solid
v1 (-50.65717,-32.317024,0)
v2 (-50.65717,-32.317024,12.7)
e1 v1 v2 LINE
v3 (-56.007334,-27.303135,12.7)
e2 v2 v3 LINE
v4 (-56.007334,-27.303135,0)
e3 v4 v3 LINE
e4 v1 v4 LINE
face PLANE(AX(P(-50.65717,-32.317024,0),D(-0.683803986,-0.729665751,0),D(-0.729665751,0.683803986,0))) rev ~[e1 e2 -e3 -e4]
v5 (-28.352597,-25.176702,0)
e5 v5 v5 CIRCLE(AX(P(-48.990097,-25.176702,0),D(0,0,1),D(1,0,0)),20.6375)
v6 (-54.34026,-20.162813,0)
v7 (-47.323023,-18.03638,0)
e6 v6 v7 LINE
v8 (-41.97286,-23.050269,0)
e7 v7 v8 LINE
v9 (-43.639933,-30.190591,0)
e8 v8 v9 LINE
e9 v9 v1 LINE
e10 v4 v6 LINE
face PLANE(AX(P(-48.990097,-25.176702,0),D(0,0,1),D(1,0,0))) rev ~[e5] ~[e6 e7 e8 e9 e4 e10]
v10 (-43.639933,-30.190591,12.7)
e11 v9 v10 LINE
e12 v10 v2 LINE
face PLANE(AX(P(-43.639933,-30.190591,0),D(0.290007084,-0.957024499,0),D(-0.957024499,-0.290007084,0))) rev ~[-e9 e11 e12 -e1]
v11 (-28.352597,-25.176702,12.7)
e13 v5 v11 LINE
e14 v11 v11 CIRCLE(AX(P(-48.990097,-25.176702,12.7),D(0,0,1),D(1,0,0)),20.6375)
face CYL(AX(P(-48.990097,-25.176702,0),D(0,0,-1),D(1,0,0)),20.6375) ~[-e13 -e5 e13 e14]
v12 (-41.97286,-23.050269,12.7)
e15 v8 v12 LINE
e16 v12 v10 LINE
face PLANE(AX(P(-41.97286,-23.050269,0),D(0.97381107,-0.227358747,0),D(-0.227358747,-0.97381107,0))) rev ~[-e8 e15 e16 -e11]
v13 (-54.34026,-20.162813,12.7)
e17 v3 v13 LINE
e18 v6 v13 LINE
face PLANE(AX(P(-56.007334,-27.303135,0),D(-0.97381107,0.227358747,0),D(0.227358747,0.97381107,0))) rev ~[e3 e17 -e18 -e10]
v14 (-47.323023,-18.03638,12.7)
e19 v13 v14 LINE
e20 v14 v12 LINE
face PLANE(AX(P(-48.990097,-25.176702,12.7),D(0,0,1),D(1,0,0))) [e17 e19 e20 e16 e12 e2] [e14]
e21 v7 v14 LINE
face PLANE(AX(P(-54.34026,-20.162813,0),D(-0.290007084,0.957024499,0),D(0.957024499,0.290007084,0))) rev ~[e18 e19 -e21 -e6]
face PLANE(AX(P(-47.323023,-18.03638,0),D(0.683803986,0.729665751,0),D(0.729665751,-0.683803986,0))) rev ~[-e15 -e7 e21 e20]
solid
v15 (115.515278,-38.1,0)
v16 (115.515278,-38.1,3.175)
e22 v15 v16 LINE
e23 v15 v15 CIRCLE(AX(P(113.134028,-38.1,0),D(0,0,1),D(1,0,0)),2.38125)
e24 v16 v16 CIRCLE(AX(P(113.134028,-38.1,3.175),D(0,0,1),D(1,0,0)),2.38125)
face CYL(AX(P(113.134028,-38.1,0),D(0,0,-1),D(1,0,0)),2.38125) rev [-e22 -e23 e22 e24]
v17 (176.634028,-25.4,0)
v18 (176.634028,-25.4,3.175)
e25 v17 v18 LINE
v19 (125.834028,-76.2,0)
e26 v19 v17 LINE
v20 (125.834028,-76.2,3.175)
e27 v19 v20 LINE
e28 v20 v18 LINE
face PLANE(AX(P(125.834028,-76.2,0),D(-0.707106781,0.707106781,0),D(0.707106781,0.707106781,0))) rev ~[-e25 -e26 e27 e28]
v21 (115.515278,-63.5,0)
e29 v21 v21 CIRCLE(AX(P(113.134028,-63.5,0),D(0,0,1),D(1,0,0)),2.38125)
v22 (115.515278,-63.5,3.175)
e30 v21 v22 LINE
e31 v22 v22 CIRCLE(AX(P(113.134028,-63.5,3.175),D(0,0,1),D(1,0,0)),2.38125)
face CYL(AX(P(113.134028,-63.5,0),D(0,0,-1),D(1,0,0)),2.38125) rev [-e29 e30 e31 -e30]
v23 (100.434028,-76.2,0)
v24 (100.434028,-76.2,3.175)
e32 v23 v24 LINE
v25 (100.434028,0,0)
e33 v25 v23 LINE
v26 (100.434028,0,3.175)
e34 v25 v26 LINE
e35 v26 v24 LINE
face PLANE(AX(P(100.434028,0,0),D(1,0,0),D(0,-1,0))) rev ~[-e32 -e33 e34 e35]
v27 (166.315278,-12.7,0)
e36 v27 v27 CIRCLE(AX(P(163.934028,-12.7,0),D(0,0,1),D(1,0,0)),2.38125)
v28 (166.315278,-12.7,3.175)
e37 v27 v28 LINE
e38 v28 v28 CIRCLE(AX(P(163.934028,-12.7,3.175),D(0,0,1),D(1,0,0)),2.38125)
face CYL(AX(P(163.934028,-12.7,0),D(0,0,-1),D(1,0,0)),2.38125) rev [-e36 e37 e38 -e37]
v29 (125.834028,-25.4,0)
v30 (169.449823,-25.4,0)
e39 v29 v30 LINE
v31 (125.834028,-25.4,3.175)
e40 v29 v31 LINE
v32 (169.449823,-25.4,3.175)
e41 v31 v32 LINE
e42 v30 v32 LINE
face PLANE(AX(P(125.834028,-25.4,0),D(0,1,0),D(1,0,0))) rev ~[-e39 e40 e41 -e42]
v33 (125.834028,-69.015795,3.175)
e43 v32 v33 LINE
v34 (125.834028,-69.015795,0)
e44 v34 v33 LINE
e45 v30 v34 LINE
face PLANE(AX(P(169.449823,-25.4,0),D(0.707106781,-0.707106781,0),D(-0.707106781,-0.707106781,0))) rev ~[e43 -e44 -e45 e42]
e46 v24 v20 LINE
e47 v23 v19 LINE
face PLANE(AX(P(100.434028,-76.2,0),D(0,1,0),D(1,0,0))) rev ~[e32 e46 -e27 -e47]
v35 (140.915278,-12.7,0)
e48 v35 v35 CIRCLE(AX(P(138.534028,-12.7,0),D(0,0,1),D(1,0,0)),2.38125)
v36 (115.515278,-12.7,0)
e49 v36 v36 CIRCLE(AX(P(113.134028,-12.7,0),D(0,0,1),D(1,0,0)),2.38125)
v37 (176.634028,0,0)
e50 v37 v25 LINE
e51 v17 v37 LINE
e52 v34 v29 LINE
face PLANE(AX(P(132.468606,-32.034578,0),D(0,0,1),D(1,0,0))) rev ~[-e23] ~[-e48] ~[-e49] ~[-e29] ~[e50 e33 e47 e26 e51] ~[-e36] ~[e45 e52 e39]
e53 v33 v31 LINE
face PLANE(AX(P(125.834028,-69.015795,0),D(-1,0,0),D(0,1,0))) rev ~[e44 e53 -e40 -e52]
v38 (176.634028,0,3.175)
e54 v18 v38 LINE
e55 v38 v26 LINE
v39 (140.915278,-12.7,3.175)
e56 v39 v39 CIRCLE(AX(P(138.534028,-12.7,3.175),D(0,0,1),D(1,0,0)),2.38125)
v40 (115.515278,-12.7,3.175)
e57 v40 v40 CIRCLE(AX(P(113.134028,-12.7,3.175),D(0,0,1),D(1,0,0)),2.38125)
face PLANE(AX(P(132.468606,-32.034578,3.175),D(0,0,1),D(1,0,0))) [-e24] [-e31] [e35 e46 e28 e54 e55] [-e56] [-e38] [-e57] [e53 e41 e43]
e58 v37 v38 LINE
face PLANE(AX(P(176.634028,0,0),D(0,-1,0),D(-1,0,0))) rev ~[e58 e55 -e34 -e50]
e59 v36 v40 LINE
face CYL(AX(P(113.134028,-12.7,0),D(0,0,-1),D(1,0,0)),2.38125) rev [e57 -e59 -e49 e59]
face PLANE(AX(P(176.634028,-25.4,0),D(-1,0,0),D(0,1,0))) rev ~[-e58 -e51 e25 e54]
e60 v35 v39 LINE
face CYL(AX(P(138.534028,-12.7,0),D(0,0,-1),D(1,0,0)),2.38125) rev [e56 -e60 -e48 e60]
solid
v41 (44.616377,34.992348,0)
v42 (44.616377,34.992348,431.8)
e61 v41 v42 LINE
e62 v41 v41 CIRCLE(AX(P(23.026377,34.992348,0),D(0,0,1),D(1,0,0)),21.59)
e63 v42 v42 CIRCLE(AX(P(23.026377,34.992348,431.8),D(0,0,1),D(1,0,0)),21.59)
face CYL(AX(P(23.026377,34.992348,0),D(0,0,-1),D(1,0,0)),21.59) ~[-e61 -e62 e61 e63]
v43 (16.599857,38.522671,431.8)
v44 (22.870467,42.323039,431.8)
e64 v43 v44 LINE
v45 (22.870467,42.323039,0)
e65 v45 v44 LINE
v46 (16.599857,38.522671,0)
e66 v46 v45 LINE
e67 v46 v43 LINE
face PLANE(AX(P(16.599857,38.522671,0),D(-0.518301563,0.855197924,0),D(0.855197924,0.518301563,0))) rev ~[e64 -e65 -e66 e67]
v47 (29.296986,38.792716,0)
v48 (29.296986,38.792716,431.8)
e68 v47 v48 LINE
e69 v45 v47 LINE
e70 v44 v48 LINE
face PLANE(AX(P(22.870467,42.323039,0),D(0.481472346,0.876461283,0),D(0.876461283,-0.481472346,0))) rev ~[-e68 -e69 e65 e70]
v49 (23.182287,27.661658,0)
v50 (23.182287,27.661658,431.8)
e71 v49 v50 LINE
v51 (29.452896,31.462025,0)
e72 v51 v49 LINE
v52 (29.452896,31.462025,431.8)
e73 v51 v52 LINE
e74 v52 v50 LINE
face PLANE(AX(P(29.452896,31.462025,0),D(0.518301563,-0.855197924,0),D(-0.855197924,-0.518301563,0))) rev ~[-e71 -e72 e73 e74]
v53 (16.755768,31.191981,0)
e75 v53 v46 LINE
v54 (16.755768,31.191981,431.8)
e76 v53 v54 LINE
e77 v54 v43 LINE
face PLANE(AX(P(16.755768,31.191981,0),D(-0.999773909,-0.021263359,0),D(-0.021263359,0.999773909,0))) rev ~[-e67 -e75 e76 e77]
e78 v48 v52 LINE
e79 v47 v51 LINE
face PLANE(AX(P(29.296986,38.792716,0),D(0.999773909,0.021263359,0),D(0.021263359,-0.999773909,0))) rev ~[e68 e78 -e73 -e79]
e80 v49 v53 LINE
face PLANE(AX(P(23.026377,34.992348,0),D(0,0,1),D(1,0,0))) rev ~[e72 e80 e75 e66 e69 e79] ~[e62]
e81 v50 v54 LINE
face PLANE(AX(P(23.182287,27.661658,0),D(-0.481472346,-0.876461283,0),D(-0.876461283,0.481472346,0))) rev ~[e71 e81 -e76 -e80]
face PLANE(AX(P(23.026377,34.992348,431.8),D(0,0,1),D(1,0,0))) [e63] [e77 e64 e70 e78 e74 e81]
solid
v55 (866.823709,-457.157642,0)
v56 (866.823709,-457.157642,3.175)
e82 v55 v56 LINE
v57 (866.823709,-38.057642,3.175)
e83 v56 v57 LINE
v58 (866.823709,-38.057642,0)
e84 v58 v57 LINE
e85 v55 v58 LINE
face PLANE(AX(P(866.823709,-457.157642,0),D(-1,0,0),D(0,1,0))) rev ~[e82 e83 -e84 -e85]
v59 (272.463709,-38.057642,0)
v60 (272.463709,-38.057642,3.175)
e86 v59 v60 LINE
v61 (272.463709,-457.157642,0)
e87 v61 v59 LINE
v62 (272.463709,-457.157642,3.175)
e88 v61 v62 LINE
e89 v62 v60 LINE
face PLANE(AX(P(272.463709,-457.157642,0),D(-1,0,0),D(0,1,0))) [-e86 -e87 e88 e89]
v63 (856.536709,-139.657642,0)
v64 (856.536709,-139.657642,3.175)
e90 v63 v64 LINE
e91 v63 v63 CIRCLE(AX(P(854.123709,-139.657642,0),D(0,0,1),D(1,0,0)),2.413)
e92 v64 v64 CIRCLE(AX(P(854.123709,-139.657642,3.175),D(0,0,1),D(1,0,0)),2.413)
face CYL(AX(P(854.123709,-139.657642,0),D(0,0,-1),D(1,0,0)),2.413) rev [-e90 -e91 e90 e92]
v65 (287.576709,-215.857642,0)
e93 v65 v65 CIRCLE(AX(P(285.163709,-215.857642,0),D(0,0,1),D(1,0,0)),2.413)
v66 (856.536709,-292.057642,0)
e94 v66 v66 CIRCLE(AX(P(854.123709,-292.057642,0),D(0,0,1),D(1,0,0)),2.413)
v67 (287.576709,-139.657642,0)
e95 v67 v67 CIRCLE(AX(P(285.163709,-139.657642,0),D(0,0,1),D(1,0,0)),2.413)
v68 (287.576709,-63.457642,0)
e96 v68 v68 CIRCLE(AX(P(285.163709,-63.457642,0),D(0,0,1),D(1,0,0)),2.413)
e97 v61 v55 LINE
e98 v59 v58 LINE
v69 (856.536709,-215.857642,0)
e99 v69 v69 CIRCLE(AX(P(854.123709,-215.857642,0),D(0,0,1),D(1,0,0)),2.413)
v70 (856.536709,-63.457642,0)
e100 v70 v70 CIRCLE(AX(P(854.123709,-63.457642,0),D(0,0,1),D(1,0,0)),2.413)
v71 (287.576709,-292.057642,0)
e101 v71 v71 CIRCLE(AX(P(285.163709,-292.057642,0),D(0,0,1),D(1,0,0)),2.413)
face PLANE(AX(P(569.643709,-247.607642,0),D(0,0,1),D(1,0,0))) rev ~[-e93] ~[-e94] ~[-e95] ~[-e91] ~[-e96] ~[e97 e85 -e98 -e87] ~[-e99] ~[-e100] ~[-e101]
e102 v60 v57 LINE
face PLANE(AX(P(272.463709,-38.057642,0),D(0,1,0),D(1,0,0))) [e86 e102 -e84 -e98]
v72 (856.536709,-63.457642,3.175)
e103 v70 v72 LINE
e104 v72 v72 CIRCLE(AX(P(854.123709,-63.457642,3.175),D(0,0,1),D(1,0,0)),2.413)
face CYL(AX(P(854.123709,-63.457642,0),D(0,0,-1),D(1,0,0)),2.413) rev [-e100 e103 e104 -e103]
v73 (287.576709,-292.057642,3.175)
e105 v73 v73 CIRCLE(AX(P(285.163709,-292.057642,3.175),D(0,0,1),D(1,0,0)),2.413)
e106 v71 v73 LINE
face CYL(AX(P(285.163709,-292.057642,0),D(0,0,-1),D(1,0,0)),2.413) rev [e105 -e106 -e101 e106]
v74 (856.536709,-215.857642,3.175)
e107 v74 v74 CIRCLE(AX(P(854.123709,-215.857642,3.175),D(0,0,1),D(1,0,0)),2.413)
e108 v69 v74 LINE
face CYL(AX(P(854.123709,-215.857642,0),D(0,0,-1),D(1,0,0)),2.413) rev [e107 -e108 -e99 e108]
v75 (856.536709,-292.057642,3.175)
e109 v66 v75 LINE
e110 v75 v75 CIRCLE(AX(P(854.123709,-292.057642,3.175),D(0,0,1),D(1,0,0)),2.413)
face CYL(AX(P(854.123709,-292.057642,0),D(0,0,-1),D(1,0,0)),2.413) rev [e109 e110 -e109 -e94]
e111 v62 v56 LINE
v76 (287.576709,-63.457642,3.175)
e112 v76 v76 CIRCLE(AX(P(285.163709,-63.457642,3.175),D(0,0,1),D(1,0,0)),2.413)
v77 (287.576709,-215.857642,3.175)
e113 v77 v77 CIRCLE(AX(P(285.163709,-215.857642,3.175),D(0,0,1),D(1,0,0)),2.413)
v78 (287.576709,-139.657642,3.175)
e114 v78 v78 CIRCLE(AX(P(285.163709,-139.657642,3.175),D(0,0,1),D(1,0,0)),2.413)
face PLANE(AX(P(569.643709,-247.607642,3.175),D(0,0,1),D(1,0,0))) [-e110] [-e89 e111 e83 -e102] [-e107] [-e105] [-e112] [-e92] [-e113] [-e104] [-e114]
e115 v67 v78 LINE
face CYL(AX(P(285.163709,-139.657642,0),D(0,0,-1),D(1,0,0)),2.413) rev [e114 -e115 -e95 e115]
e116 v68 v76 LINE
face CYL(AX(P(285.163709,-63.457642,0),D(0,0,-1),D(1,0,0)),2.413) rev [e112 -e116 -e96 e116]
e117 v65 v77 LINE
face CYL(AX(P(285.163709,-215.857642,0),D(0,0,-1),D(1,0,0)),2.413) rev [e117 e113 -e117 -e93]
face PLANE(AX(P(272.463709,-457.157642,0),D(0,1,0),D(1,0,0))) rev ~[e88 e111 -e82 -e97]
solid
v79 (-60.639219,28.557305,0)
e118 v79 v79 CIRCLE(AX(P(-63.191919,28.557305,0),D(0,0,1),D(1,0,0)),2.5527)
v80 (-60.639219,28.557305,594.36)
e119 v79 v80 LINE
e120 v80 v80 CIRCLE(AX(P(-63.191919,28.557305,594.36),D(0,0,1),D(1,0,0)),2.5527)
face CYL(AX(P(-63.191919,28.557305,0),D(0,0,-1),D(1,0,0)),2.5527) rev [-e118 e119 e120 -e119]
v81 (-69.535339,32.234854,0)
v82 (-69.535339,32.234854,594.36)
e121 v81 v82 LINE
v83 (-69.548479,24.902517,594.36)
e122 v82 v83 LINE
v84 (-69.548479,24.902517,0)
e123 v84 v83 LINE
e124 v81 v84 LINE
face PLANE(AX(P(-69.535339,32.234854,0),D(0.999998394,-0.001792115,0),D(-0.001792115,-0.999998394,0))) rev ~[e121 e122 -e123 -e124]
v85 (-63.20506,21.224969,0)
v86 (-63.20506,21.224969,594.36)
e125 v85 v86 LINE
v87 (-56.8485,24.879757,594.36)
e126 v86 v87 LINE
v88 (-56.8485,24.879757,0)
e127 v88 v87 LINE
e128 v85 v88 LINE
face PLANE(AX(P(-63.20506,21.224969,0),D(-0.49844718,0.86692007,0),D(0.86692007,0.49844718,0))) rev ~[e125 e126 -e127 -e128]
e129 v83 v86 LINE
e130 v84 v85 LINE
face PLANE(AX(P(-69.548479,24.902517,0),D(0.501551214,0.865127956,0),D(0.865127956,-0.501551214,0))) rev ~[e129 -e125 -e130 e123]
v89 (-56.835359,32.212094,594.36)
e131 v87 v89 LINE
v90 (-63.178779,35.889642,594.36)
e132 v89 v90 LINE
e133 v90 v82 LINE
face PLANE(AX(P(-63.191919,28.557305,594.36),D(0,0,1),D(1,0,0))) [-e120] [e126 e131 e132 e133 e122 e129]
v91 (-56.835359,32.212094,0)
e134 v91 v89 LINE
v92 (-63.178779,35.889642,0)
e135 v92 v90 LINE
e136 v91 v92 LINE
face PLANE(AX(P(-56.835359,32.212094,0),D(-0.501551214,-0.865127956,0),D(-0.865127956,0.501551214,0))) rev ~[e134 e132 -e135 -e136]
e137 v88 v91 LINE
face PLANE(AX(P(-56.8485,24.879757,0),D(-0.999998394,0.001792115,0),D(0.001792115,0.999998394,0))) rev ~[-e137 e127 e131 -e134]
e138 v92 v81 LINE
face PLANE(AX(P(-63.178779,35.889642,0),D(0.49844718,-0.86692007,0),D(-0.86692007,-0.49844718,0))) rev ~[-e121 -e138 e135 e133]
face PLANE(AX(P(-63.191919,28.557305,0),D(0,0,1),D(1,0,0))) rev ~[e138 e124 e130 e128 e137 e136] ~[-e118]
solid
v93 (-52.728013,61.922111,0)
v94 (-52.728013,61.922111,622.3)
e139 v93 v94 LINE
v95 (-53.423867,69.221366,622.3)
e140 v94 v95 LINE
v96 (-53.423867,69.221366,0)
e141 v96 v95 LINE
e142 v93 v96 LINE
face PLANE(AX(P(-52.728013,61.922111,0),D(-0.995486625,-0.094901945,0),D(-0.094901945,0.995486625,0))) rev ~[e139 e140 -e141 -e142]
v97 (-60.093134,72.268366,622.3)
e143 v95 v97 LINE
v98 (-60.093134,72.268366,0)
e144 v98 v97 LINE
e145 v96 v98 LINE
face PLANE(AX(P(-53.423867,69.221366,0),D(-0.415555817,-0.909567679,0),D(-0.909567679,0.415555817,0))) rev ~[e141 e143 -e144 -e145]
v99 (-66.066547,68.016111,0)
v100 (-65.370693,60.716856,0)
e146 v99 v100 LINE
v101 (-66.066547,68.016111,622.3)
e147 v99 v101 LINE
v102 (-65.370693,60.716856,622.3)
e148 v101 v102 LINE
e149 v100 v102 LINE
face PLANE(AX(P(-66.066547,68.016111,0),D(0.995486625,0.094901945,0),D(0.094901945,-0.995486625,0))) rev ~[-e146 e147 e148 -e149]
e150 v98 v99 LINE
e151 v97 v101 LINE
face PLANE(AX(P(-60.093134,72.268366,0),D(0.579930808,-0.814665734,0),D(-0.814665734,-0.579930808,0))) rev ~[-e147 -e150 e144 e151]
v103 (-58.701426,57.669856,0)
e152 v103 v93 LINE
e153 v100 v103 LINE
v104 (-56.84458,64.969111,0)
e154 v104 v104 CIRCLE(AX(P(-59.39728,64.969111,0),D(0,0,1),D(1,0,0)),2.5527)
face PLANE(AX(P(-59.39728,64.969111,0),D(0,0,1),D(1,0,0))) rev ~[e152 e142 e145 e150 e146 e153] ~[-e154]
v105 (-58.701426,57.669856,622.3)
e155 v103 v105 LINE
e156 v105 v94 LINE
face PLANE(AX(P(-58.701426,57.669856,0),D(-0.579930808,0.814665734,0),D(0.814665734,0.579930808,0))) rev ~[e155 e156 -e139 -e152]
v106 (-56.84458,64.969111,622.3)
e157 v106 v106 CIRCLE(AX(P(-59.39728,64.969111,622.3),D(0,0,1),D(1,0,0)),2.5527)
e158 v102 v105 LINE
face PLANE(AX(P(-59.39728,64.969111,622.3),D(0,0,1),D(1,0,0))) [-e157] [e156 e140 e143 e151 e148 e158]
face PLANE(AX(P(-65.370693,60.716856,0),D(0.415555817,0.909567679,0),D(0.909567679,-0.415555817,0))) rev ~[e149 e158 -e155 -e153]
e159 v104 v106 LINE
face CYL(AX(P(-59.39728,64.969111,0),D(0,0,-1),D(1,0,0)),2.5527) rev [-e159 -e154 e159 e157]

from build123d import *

# Parameters (mm, degrees)
F0_R      = 2.5527
F1_DEPTH  = 622.3
F2_R      = 21.59
F3_DEPTH  = 431.8
F4_W      = 594.36
F4_H      = 419.1
F4_R      = 2.413
F5_DEPTH  = 3.175
F6_R      = 2.5527
F7_DEPTH  = 594.36
F8_R      = 20.6375
F9_DEPTH  = 12.7
F10_R     = 2.38125
F11_DEPTH = 3.175


# Not quite as in the source:
# - a length typed as a fraction of an inch, garbled in the dataset ("3 / 203.2 mm" for 3/8 in), is restored


with BuildPart() as f1:
    # F0 (on Top) → F1 (new body)
    with BuildSketch(Plane.XY):
        Polygon((-58.7014258881, 57.6698564189), (-52.7280128831, 61.9221111625), (-53.423867012, 69.221365944), (-60.0931341459, 72.2683659818), (-66.0665471509, 68.0161112382), (-65.370693022, 60.7168564567), align=None)
        with Locations((-59.397280017, 64.9691112003)):
            Circle(F0_R, mode=Mode.SUBTRACT)
    extrude(amount=F1_DEPTH)


with BuildPart() as f3:
    # F2 (on Top) → F3 (new body)
    with BuildSketch(Plane.XY):
        with Locations((23.0263769627, 34.9923484027)):
            Circle(F2_R)
        Polygon((29.2969861089, 38.7927160519), (29.4528964637, 31.4620254095), (23.1822873174, 27.6616577603), (16.7557678164, 31.1919807536), (16.5998574617, 38.522671396), (22.8704666079, 42.3230390451), align=None, mode=Mode.SUBTRACT)
    extrude(amount=F3_DEPTH)


with BuildPart() as f5:
    # F4 (on Top) → F5 (new body)
    with BuildSketch(Plane.XY):
        with Locations((569.643709116, -247.6076417923)):
            Rectangle(F4_W, F4_H)
        with Locations((285.163709116, -292.0576417923)):
            Circle(F4_R, mode=Mode.SUBTRACT)
        with Locations((854.123709116, -292.0576417923)):
            Circle(F4_R, mode=Mode.SUBTRACT)
        with Locations((285.163709116, -215.8576417923)):
            Circle(F4_R, mode=Mode.SUBTRACT)
        with Locations((285.163709116, -139.6576417923)):
            Circle(F4_R, mode=Mode.SUBTRACT)
        with Locations((285.163709116, -63.4576417923)):
            Circle(F4_R, mode=Mode.SUBTRACT)
        with Locations((854.123709116, -215.8576417923)):
            Circle(F4_R, mode=Mode.SUBTRACT)
        with Locations((854.123709116, -139.6576417923)):
            Circle(F4_R, mode=Mode.SUBTRACT)
        with Locations((854.123709116, -63.4576417923)):
            Circle(F4_R, mode=Mode.SUBTRACT)
    extrude(amount=F5_DEPTH)


with BuildPart() as f7:
    # F6 (on Top) → F7 (new body)
    with BuildSketch(Plane.XY):
        Polygon((-63.2050597455, 21.2249688073), (-56.8484997376, 24.8797572006), (-56.8353593278, 32.2120938447), (-63.1787789258, 35.8896420955), (-69.5353389336, 32.2348537022), (-69.5484793434, 24.9025170581), align=None)
        with Locations((-63.1919193356, 28.5573054514)):
            Circle(F6_R, mode=Mode.SUBTRACT)
    extrude(amount=F7_DEPTH)


with BuildPart() as f9:
    # F8 (on Top) → F9 (new body)
    with BuildSketch(Plane.XY):
        with Locations((-48.9900968969, -25.1767020673)):
            Circle(F8_R)
        Polygon((-41.9728598269, -23.0502690828), (-43.6399333779, -30.190591142), (-50.6571704479, -32.3170241264), (-56.0073339668, -27.3031350517), (-54.3402604158, -20.1628129925), (-47.3230233459, -18.0363800081), align=None, mode=Mode.SUBTRACT)
    extrude(amount=F9_DEPTH)


with BuildPart() as f11:
    # F10 (on Top) → F11 (new body)
    with BuildSketch(Plane.XY):
        Polygon((100.4340276122, 0), (100.4340276122, -76.2), (125.8340276122, -76.2), (176.6340276122, -25.4), (176.6340276122, 0), align=None)
        with Locations((113.1340276122, -63.5)):
            Circle(F10_R, mode=Mode.SUBTRACT)
        Polygon((125.8340276122, -25.4), (169.4498227154, -25.4), (125.8340276122, -69.0157951031), align=None, mode=Mode.SUBTRACT)
        with Locations((113.1340276122, -38.1)):
            Circle(F10_R, mode=Mode.SUBTRACT)
        with Locations((113.1340276122, -12.7)):
            Circle(F10_R, mode=Mode.SUBTRACT)
        with Locations((138.5340276122, -12.7)):
            Circle(F10_R, mode=Mode.SUBTRACT)
        with Locations((163.9340276122, -12.7)):
            Circle(F10_R, mode=Mode.SUBTRACT)
    extrude(amount=F11_DEPTH)


solid = Compound([f1.part, f3.part, f5.part, f7.part, f9.part, f11.part])
